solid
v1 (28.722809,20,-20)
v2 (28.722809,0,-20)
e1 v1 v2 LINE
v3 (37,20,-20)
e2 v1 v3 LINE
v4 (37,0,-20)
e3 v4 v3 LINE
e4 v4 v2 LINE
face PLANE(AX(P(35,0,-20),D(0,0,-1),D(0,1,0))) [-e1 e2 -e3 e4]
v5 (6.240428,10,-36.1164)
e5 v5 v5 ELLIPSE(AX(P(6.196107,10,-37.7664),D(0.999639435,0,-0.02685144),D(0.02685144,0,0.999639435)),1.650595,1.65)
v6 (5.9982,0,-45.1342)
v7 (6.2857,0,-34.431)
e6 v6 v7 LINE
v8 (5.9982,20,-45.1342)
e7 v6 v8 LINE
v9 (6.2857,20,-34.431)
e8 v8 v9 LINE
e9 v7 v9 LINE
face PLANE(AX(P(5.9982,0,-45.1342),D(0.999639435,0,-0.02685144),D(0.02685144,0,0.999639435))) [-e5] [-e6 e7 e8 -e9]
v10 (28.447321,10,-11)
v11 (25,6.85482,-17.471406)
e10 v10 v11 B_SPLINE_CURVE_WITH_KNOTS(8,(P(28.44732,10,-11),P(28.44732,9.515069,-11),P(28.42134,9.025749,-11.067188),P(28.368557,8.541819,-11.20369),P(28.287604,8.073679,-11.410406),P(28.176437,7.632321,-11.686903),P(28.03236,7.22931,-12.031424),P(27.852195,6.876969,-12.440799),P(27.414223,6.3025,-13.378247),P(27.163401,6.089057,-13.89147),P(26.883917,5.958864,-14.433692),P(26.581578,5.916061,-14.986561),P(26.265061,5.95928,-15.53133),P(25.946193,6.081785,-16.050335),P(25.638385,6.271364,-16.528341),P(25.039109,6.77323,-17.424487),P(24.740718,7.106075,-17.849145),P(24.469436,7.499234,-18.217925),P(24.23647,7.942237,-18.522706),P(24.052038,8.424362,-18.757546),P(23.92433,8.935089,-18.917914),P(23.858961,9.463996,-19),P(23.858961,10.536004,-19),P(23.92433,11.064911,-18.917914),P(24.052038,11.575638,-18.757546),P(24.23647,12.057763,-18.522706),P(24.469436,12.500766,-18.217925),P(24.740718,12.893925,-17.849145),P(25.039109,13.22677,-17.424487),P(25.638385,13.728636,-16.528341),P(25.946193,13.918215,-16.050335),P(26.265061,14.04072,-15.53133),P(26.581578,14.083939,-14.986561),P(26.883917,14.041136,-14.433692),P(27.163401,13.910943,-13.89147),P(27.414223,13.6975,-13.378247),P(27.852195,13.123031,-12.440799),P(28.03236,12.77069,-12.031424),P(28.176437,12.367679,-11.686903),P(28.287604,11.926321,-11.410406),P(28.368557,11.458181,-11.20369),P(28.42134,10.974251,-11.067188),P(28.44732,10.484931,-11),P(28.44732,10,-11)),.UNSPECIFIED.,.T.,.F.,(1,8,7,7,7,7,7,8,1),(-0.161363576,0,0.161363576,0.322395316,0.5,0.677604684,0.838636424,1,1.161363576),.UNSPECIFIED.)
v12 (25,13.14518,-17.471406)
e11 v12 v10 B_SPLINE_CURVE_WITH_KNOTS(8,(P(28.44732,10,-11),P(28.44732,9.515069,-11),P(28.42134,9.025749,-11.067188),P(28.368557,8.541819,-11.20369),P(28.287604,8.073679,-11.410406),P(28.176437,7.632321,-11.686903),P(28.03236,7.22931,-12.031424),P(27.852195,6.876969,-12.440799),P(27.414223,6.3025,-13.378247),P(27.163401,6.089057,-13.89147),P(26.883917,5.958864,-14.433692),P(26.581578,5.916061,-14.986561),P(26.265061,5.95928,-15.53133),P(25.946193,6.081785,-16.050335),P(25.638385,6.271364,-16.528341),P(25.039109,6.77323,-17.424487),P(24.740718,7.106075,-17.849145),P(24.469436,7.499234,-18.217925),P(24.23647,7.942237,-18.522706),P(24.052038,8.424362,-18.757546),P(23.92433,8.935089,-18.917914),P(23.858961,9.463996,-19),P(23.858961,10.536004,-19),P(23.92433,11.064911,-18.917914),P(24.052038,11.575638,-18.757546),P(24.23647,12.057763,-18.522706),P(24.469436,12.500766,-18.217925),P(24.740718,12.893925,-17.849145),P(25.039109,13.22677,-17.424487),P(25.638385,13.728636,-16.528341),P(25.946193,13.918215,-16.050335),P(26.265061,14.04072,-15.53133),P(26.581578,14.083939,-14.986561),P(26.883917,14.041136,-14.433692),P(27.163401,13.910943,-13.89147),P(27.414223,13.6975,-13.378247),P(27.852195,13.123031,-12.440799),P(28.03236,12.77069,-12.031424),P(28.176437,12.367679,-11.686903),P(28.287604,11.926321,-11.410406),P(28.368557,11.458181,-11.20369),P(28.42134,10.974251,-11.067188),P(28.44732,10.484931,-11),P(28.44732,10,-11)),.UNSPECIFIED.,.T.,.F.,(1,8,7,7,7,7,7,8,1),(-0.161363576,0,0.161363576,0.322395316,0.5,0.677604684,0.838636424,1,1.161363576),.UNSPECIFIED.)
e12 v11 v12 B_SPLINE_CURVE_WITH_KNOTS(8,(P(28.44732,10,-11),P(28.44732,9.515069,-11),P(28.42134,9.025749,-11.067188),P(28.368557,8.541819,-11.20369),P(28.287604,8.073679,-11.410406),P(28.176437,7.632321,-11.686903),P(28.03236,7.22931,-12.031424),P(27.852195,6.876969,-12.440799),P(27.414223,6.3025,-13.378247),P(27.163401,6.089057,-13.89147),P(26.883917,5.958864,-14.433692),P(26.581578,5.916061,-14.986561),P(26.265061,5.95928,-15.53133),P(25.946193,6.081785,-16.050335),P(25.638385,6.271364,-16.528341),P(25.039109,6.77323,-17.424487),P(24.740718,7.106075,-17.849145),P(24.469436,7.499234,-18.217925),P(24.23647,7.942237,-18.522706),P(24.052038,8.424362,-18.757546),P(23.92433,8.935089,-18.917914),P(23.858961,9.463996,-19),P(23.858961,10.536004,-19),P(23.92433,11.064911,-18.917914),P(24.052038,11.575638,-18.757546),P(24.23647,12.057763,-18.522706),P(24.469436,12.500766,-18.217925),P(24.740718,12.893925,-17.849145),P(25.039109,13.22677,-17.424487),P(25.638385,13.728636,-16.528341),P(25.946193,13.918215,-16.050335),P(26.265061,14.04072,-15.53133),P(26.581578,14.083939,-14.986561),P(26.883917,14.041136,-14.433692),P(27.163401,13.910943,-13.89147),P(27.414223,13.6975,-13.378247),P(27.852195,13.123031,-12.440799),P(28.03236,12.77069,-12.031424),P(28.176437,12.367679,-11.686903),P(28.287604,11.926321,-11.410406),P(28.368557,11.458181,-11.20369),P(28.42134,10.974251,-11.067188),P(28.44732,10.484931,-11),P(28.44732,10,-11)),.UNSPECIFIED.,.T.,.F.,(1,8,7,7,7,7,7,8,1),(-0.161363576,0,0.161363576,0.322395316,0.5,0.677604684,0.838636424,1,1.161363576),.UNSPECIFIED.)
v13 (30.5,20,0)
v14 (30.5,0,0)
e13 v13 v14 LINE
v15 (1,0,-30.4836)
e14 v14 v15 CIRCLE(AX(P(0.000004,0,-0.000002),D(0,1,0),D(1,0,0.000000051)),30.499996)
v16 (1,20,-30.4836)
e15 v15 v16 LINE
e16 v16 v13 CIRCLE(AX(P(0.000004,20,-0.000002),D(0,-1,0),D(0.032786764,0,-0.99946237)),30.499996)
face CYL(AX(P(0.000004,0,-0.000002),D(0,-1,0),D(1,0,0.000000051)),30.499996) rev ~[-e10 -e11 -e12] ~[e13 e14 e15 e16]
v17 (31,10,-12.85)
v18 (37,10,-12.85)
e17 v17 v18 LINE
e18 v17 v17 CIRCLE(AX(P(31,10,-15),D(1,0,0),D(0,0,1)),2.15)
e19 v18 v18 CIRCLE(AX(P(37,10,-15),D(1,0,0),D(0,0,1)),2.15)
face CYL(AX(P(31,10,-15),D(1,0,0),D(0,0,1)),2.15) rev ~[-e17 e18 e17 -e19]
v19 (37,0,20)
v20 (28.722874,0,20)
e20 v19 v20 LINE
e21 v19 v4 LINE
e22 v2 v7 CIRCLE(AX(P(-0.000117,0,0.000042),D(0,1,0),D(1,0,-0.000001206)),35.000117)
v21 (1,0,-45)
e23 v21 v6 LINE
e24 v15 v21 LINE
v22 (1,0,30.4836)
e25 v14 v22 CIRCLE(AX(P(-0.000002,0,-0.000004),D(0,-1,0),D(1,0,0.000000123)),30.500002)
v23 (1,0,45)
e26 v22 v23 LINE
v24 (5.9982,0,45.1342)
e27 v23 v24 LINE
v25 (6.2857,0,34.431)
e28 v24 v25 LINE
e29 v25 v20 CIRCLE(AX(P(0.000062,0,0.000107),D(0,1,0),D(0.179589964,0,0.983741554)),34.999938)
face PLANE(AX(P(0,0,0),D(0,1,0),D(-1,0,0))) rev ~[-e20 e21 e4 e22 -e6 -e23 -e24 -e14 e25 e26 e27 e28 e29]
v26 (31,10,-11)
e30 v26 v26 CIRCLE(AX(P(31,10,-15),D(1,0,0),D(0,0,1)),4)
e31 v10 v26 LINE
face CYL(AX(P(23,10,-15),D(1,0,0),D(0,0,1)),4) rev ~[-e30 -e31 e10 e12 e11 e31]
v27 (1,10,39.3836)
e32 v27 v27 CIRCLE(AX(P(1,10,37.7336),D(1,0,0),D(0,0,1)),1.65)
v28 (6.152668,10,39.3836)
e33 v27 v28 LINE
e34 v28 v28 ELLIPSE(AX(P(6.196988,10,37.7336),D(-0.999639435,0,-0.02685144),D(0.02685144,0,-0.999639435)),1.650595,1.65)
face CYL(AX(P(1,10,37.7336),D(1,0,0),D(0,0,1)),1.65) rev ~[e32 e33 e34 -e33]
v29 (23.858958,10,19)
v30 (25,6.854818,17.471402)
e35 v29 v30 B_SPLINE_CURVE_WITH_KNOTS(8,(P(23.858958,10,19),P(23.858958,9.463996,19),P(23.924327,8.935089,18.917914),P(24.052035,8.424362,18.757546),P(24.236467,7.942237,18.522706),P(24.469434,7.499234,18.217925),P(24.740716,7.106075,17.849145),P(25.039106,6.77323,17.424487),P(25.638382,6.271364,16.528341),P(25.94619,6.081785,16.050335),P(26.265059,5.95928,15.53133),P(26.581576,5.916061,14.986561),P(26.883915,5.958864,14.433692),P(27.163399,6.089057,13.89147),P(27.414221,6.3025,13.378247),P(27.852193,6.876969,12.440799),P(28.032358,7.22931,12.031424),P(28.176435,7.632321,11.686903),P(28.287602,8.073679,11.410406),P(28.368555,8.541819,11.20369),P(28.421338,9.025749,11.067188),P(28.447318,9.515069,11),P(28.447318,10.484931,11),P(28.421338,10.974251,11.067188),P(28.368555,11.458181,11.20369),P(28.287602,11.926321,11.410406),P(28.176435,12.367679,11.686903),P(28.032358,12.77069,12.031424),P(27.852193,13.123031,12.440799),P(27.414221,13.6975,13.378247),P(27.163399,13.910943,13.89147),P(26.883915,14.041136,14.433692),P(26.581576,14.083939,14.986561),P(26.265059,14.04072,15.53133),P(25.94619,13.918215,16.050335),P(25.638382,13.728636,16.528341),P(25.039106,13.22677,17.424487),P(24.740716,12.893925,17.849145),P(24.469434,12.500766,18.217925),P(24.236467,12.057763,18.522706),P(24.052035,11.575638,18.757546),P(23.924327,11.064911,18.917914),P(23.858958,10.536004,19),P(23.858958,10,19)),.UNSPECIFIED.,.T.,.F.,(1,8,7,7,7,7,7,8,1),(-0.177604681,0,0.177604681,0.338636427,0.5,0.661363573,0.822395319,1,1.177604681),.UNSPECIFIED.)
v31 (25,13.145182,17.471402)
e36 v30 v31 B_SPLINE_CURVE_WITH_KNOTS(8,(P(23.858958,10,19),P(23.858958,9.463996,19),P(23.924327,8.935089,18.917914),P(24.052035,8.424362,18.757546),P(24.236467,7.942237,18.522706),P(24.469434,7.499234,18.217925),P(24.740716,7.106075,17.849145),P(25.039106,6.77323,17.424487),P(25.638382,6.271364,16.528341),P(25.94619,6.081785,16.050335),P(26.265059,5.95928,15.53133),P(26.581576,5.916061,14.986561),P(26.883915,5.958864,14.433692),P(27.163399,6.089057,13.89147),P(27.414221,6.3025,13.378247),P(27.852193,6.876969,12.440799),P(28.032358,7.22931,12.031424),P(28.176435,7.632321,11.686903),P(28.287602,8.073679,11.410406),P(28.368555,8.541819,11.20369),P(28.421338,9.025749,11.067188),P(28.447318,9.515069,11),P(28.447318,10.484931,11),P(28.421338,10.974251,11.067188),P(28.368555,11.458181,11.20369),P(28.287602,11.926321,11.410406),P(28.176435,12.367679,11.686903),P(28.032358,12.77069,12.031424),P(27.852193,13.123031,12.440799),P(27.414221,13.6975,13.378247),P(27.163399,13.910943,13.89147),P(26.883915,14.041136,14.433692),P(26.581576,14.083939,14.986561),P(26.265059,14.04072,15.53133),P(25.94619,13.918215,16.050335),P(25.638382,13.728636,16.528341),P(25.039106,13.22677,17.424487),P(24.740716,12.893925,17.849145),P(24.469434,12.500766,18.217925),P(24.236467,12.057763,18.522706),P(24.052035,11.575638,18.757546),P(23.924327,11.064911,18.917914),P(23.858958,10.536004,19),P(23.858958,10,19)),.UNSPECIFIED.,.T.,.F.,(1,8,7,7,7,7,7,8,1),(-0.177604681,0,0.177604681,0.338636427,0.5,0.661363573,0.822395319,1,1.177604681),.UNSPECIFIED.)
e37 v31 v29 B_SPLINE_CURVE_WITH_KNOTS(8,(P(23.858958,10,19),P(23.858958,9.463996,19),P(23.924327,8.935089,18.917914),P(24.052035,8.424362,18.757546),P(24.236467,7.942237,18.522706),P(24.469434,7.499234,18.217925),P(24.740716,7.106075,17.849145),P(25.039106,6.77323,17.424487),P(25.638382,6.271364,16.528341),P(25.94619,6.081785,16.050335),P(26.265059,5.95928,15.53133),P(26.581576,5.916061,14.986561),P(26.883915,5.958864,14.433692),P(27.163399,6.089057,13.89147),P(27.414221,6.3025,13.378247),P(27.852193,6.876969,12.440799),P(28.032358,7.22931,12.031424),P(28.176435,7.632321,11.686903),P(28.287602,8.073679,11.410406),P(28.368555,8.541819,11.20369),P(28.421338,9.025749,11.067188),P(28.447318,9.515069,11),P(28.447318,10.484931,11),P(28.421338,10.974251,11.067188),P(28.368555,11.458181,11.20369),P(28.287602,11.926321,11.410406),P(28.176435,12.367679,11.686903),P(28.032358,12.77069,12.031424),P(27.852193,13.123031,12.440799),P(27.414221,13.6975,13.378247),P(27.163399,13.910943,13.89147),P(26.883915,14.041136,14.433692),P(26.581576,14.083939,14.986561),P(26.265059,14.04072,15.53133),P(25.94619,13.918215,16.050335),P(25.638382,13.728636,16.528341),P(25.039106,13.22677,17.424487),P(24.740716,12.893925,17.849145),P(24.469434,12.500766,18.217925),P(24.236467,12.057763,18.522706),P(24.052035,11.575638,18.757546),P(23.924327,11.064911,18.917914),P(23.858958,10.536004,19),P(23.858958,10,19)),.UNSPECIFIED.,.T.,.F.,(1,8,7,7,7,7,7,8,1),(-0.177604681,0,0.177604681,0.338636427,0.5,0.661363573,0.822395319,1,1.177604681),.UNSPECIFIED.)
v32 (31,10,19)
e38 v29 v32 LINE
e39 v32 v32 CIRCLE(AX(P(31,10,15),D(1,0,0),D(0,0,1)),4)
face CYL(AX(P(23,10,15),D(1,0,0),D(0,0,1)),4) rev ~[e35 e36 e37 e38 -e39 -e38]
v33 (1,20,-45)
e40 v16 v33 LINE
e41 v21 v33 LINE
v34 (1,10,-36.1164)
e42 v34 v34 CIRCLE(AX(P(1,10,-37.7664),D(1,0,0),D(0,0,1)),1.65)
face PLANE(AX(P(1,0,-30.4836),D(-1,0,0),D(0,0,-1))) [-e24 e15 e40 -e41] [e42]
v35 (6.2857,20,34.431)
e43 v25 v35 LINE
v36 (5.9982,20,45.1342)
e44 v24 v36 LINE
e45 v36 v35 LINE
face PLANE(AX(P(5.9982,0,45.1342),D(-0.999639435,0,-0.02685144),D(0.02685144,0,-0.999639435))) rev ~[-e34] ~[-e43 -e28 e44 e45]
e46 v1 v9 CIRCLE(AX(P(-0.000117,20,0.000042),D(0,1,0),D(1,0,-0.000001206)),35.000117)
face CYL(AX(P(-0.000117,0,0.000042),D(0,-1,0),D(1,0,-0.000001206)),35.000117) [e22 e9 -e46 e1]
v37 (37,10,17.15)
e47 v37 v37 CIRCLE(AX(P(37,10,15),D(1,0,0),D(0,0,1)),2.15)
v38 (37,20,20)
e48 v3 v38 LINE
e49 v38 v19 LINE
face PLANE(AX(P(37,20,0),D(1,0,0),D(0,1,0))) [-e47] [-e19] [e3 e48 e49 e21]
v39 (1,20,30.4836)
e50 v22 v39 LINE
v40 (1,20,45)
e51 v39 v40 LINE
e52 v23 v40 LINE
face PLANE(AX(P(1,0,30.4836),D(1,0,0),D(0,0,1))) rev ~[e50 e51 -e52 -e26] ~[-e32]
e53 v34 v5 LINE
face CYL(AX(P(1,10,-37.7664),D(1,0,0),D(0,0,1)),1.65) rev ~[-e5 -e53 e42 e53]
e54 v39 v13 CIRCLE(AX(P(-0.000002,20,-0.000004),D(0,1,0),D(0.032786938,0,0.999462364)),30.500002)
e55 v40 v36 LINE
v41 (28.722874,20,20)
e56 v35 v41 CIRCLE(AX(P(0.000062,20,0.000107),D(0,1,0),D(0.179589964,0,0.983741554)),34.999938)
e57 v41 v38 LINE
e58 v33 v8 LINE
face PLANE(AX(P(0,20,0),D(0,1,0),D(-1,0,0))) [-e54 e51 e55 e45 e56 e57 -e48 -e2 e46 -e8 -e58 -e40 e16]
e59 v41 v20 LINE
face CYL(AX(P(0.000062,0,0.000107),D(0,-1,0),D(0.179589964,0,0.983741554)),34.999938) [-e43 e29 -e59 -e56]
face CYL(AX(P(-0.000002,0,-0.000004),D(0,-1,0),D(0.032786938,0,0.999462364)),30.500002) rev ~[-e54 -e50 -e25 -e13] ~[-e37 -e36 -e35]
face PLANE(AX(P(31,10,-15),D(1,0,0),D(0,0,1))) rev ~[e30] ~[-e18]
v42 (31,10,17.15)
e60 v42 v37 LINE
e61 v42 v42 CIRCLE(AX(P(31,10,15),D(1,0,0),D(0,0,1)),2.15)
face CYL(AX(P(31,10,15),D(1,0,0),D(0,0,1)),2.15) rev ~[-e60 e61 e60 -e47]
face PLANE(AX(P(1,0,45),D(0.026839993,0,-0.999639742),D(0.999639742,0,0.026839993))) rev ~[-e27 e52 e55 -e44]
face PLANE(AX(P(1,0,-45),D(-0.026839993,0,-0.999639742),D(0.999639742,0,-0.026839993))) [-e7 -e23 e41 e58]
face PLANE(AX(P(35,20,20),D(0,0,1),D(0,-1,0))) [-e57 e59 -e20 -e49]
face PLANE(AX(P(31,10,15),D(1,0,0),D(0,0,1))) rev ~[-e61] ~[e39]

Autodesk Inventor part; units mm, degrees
ref_plane "YZ Plane" through (0, 0, 0) normal (1, 0, 0) x (0, 1, 0)
ref_plane "XZ Plane" through (0, 0, 0) normal (0, 1, 0) x (-1, 0, 0)
ref_plane "XY Plane" through (0, 0, 0) normal (0, 0, 1) x (1, 0, 0)
sketch "Skizze1" plane through (0, 0, 0) normal (0, 1, 0) x (-1, 0, 0)
  arc A0 (-1, 30.4836) -> (-30.5, 0) centre (0, 0) ccw
  arc A1 (-6.2857, 34.431) -> (-35, 0) centre (0, 0) ccw
  line L0 (-1, 45) -> (-5.9982, 45.1342)
  line L1 (-5.9982, 45.1342) -> (-6.2857, 34.431)
  line L2 (0, 0) -> (-14.1914, 0) construction
  line L3 (-1, 30.4836) -> (-1, 45)
  arc A2 (-30.5, 0) -> (-1, -30.4836) centre (0, 0) ccw
  arc A3 (-35, 0) -> (-6.2857, -34.431) centre (0, 0) ccw
  line L4 (-1, -45) -> (-5.9982, -45.1342)
  line L5 (-5.9982, -45.1342) -> (-6.2857, -34.431)
  line L6 (-1, -30.4836) -> (-1, -45)
  dimension "d59" = 30.5
  dimension "d60" = 35
  dimension "d72" = 1
  dimension "d73" = 5
  dimension "d74" = 45
  dimension "d75" = 10.7071
extrude "Extrusion1" add sketch "Skizze1" along normal blind 20
ref_plane "Arbeitsebene1" through (35, 20, 0) normal (1, 0, 0) x (0, 1, 0)
sketch "Skizze3" plane through (35, 20, 0) normal (1, 0, 0) x (0, 1, 0)
  line L0 (0, -30.4836) -> (0, 30.4836) projected
  line L1 (0, 20) -> (-20, 20)
  line L2 (-20, 20) -> (-20, -20)
  line L3 (-20, -20) -> (0, -20)
  line L4 (0, -20) -> (0, 20)
  point P0 (-20, 0)
  dimension "d28" = 20
  dimension "d30" = 20
  dimension "d31" = 20
extrude "Extrusion2" add sketch "Skizze3" against normal blind 10 and the other way blind 2
sketch "Skizze5" plane through (1, 0, 30.4836) normal (-1, 0, 0) x (0, 0, 1)
  line L0 (14.5, 0) -> (14.5, 20) construction
  line L1 (14.5, 10) -> (-75.5, 10) construction
  line L2 (-75.5, 0) -> (-75.5, 20) construction
  line L3 (-75.5, 20) -> (-61, 20) construction
  line L4 (-68.25, 20) -> (-68.25, 0) construction
  line L5 (-61, 0) -> (-75.5, 0) construction
  line L6 (0, 20) -> (14.5, 20) construction
  line L7 (7.25, 20) -> (7.25, 0) construction
  line L8 (14.5, 0) -> (0, 0) construction
  point P0 (-30.5, 0)
  point P1 (7.25, 10)
  point P2 (-68.25, 10)
hole "Bohrung3" at (1, 10, 37.7336) at (1, 10, -37.7664) direction (1, 0, 0) diameter 3.3 end through all
ref_plane "Arbeitsebene2" through (23, 20, 0) normal (1, 0, 0) x (0, 1, 0)
sketch "Skizze7" plane through (23, 20, 0) normal (1, 0, 0) x (0, 1, 0)
  line L0 (0, 30.4836) -> (0, -30.4836) projected
  point P0 (-20, 0)
  point P1 (-10, 15)
  point P2 (-10, -15)
  dimension "d81" = 10
  dimension "d82" = 10
  dimension "d84" = 15
  dimension "d94" = 15
hole "Bohrung4" at (23, 10, 15) at (23, 10, -15) direction (1, 0, 0) diameter 4.3 end through all counterbore diameter 8 counterbore depth 8
delete faces "Fläche löschen1" heal yes whole lump no faces at (25, 2.4288, 4.0204)
properties part number "spannringe"
